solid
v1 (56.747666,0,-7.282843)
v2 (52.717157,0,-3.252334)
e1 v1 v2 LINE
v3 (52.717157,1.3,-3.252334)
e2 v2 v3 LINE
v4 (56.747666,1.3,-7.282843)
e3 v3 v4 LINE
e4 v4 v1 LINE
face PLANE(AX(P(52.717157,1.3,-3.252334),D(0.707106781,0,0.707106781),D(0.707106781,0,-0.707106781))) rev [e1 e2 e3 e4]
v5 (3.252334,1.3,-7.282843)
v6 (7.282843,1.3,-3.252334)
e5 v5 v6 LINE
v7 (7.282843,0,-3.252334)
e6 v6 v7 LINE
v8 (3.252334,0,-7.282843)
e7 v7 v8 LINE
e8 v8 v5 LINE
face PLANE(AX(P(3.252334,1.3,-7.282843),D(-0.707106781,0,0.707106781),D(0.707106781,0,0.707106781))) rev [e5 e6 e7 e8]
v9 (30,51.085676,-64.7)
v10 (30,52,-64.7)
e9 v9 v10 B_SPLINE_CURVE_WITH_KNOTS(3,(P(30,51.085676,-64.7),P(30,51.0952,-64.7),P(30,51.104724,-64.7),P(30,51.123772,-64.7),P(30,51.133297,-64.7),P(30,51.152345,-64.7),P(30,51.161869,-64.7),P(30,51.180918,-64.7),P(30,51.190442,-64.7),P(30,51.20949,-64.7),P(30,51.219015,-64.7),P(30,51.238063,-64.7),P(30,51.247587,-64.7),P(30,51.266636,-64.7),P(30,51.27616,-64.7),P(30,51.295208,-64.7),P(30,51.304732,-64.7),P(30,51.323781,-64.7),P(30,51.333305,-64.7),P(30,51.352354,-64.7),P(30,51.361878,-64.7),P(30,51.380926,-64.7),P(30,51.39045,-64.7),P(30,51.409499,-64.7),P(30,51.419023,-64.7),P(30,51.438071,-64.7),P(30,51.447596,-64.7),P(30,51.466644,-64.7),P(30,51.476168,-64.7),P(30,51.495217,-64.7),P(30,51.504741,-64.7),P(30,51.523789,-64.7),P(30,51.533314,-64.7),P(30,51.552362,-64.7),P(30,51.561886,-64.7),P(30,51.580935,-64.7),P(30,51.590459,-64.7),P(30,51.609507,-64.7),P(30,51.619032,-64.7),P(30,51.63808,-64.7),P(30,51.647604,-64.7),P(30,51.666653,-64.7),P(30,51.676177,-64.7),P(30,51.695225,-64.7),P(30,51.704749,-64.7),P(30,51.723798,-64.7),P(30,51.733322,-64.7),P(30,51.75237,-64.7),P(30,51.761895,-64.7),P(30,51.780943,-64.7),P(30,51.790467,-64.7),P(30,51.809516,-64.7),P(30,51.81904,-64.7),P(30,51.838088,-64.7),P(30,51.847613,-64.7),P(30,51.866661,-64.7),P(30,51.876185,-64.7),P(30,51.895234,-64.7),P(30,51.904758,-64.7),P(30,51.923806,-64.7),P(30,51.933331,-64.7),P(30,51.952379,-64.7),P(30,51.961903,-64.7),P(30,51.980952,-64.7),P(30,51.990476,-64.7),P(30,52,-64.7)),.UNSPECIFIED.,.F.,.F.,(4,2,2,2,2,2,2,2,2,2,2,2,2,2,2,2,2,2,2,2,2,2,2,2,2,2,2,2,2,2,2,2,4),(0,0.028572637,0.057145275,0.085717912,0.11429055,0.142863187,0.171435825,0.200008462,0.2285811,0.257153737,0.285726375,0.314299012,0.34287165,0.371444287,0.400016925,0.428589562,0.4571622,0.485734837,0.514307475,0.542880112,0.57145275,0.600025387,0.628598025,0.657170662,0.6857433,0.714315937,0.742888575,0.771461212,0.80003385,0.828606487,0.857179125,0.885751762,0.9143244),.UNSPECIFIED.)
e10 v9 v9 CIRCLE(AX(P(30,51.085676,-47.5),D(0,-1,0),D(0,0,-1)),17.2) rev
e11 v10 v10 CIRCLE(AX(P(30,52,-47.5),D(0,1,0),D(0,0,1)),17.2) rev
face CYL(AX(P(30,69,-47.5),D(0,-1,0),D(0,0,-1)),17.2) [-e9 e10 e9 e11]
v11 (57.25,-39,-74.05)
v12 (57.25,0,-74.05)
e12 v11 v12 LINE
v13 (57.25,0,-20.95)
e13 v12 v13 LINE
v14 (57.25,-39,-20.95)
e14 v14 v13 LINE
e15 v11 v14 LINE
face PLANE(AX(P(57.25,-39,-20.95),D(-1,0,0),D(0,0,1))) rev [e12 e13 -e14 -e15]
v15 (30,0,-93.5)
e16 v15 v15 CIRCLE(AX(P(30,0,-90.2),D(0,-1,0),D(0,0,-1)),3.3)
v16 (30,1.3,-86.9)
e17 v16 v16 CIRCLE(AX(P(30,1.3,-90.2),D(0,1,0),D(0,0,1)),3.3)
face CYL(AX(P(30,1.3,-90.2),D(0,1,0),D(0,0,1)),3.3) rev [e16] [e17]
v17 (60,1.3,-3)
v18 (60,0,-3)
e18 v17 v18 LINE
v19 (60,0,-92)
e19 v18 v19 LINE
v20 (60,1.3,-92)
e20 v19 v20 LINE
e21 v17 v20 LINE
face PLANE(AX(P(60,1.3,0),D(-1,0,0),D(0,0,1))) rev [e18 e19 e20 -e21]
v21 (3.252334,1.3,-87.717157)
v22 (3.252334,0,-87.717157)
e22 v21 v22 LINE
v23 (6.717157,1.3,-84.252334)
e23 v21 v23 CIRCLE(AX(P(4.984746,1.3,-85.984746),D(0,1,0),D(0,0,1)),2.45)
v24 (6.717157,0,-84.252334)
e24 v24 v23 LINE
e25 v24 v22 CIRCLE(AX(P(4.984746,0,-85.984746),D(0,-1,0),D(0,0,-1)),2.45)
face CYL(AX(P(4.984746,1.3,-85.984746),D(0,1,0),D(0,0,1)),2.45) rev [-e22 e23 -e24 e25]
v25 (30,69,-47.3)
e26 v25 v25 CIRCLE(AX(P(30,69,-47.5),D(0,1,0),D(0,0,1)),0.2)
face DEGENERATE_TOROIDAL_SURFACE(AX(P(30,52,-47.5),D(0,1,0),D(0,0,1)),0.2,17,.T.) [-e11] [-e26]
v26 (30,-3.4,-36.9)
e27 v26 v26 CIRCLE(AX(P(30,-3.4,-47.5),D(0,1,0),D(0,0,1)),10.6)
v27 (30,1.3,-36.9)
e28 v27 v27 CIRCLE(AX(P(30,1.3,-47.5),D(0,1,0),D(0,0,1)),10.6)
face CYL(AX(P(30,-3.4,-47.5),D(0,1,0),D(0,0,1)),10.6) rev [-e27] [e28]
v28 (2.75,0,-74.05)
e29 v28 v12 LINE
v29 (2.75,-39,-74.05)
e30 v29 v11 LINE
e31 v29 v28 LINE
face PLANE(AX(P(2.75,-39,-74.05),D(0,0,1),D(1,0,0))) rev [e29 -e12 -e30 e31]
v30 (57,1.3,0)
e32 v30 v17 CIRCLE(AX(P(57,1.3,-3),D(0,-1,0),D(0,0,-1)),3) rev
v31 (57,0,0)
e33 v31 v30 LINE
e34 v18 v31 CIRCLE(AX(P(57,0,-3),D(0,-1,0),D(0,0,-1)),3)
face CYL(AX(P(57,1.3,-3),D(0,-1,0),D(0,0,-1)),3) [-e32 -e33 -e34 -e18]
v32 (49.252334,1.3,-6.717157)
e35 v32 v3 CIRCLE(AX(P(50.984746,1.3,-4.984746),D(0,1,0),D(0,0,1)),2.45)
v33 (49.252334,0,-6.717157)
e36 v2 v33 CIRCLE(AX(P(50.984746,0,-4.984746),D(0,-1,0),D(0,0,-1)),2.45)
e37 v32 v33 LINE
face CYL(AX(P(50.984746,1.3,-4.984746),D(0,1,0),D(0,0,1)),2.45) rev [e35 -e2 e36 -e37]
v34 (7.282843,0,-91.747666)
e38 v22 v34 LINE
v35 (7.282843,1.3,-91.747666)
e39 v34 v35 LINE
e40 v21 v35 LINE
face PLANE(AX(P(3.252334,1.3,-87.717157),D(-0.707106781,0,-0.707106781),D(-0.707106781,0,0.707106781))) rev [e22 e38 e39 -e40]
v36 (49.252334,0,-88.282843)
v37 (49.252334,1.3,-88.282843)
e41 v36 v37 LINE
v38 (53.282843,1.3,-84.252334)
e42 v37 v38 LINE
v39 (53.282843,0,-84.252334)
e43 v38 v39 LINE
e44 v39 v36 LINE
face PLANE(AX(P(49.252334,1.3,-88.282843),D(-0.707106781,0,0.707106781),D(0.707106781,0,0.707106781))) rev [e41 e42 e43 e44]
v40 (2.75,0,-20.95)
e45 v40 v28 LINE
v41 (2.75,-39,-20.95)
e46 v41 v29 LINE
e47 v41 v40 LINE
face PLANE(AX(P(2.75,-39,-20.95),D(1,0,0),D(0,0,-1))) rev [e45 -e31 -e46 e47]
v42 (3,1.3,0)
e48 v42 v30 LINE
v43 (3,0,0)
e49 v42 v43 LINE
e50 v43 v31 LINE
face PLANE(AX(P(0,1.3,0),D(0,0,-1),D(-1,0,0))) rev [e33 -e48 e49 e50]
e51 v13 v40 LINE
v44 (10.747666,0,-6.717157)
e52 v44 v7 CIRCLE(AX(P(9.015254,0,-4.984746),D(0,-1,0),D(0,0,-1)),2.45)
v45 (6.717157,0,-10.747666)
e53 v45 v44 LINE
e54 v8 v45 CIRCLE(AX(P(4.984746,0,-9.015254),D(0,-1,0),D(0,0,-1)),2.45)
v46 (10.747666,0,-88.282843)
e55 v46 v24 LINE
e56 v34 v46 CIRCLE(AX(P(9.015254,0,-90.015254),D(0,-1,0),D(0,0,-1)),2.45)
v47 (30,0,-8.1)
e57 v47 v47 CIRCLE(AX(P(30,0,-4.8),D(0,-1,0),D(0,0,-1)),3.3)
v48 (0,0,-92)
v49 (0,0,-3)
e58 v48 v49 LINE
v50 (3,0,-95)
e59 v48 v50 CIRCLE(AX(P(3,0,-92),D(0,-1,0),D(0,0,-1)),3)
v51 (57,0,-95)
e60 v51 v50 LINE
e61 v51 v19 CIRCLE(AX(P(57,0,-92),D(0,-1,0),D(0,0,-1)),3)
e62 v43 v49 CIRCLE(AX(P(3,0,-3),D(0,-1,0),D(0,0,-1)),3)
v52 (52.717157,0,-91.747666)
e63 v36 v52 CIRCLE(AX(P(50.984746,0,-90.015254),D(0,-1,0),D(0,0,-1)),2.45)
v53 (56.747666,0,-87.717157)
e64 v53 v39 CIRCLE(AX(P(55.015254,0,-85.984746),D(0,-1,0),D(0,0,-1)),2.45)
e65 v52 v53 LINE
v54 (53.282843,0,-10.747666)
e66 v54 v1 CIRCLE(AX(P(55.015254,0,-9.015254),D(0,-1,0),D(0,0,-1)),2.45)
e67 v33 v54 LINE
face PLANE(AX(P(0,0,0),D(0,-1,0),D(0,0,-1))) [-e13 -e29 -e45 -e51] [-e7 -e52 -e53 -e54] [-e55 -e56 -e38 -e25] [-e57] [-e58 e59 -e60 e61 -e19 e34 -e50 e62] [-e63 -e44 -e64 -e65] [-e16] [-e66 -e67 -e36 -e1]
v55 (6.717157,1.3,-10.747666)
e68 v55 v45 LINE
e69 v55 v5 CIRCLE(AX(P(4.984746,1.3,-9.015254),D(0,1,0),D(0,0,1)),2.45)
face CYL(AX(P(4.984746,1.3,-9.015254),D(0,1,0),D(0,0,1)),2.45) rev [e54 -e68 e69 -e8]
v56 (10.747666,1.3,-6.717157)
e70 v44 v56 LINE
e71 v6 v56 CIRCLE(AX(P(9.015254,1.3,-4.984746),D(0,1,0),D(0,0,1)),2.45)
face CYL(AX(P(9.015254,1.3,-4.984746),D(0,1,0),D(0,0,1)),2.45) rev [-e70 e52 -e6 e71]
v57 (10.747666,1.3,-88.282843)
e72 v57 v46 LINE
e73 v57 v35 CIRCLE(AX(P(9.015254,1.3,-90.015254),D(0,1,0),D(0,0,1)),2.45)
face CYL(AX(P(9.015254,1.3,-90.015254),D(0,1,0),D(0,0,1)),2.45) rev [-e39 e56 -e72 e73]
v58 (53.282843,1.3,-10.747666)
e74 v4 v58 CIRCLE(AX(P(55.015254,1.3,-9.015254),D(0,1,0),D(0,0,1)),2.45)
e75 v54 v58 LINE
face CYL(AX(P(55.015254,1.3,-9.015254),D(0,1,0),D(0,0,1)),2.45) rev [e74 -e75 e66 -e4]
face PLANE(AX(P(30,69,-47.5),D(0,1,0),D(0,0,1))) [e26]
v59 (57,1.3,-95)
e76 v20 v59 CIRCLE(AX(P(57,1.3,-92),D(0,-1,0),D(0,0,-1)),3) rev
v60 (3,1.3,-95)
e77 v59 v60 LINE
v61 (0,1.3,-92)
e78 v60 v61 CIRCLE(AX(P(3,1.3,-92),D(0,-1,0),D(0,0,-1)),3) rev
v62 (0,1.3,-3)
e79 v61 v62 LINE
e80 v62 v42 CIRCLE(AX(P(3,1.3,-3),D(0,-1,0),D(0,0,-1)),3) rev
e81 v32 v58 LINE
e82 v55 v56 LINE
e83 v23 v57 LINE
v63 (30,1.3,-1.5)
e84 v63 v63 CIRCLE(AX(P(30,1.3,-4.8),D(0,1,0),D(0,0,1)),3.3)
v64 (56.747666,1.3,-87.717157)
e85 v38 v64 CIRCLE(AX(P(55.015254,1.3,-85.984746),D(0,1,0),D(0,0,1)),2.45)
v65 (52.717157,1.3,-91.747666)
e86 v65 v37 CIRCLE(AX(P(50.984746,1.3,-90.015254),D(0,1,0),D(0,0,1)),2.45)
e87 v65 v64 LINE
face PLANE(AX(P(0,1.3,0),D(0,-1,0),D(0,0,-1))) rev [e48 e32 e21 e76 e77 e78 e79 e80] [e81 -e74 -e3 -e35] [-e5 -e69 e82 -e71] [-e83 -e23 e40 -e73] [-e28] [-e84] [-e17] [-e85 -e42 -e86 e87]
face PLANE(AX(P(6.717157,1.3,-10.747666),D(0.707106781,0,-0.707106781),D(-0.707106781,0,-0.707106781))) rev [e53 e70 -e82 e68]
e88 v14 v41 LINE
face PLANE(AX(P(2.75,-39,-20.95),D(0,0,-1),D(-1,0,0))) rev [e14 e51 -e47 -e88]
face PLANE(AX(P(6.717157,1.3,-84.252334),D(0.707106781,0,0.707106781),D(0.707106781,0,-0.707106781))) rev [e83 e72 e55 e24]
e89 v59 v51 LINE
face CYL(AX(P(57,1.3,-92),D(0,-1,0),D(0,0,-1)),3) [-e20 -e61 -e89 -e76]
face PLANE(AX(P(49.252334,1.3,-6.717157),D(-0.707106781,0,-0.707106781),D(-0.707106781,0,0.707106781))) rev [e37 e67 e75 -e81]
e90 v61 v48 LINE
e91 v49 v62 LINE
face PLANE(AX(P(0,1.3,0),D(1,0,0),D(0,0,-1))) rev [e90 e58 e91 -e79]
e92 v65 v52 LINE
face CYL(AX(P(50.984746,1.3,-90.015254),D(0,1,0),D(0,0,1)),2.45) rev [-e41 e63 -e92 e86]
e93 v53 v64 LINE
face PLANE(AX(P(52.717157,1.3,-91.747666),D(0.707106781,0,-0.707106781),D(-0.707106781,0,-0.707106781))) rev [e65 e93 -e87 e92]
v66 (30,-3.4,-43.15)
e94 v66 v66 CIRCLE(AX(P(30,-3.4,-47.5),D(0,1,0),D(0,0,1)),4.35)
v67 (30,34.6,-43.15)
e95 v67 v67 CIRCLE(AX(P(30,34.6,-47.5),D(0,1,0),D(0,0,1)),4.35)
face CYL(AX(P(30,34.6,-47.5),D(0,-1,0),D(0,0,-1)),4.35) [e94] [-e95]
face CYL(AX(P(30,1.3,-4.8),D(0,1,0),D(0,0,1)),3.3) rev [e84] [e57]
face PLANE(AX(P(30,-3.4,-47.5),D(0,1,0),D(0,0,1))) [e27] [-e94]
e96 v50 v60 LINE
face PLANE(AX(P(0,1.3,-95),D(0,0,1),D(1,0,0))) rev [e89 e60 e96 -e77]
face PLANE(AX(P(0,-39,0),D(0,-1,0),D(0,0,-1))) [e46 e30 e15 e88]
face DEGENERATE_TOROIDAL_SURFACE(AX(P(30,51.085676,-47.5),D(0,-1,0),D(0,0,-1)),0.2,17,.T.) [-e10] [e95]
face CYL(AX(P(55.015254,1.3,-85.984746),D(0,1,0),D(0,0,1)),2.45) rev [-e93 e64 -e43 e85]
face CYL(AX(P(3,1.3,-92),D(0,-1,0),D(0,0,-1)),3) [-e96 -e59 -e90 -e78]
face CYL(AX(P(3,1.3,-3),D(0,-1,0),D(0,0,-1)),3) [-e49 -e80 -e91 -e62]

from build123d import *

# Parameters (mm, degrees)
SKETCH1_W                = 60
SKETCH1_H                = 95
BOSS_EXTRUDE1_DEPTH      = 1.3
SKETCH3_W                = 54.5
SKETCH3_H                = 53.1
BOSS_EXTRUDE2_DEPTH      = 39
SKETCH2_R                = 10.6
CUT_EXTRUDE1_DEPTH       = 4.7
SKETCH4_R                = 4.35
BOSS_EXTRUDE3_DEPTH      = 38
SKETCH5_R                = 17.2
BOSS_EXTRUDE4_DEPTH      = 34.4
FILLET1_R                = 17
M6_CLEARANCE_SLOT1_D     = 6.6
M5_CLEARANCE_SLOT1_DEPTH = 1.3
M5_CLEARANCE_SLOT2_DEPTH = 1.3
FILLET2_R                = 3


# Read off the part's stored shape, not the designer's step: M5 Clearance Slot1, M5 Clearance Slot2
with BuildPart() as part:
    # Sketch1 → Boss-Extrude1 (new body)
    with BuildSketch(Plane(origin=(0, 0, 0), x_dir=(1, 0, 0), z_dir=(0, 1, 0))):
        with Locations((30, 47.5)):
            Rectangle(SKETCH1_W, SKETCH1_H)
    extrude(amount=BOSS_EXTRUDE1_DEPTH)

    # Sketch3 → Boss-Extrude2 (add)
    with BuildSketch(Plane.XZ):
        with Locations((30, -47.5)):
            Rectangle(SKETCH3_W, SKETCH3_H)
    extrude(amount=BOSS_EXTRUDE2_DEPTH)

    # Sketch2 → Cut-Extrude1 (cut)
    with BuildSketch(Plane(origin=(0, 1.3, 0), x_dir=(1, 0, 0), z_dir=(0, 1, 0))):
        with Locations(Location((30, 47.5, 0), (0, 0, 270))):
            Circle(SKETCH2_R)
    extrude(amount=-CUT_EXTRUDE1_DEPTH, mode=Mode.SUBTRACT)

    # Sketch4 → Boss-Extrude3 (add)
    with BuildSketch(Plane(origin=(0, -3.4, 0), x_dir=(1, 0, 0), z_dir=(0, 1, 0))):
        with Locations(Location((30, 47.5, 0), (0, 0, 270))):
            Circle(SKETCH4_R)
    extrude(amount=BOSS_EXTRUDE3_DEPTH)

    # Sketch5 → Boss-Extrude4 (add)
    with BuildSketch(Plane(origin=(0, 34.6, 0), x_dir=(1, 0, 0), z_dir=(0, 1, 0))):
        with Locations(Location((30, 47.5, 0), (0, 0, 90))):
            Circle(SKETCH5_R)
    extrude(amount=BOSS_EXTRUDE4_DEPTH)

    # Fillet1
    # the kernel refuses this fillet: 17 mm, written as the material it takes off along each edge
    with BuildSketch(Plane(origin=(30, 34.6, -47.5), x_dir=(0, 0, -1), z_dir=(1, 0, 0))) as fillet1_piece_1:
        with BuildLine():
            CenterArc((0.2, 16.4856756), FILLET1_R, 284.129695419, 75.870304581)
            Line((4.35, 0), (4.433, -0.329713512))
            ThreePointArc((4.433, -0.329713512), (10.775, -0.34), (17.2, -0.34))
            Line((17.2, -0.34), (17.54, 0))
            Line((17.54, 0), (17.54, 16.4856756))
            Line((17.54, 16.4856756), (17.2, 16.4856756))
        make_face()
    revolve(axis=Axis((30, 34.6, -47.5), (0, 1, 0)), mode=Mode.SUBTRACT)
    with BuildSketch(Plane(origin=(30, 69, -47.5), x_dir=(0, 0, -1), z_dir=(1, 0, 0))) as fillet1_piece_2:
        with BuildLine():
            CenterArc((17.2 - FILLET1_R, -FILLET1_R), FILLET1_R, 0, 90)
            Line((17.2 - FILLET1_R, 0), (17.2 - FILLET1_R, FILLET1_R * 0.02))
            Line((17.2 - FILLET1_R, FILLET1_R * 0.02), (17.2, FILLET1_R * 0.02))
            Line((17.2, FILLET1_R * 0.02), (17.2 + FILLET1_R * 0.02, 0))
            Line((17.2 + FILLET1_R * 0.02, 0), (17.2 + FILLET1_R * 0.02, -FILLET1_R))
            Line((17.2 + FILLET1_R * 0.02, -FILLET1_R), (17.2, -FILLET1_R))
        make_face()
    revolve(axis=Axis((30, 69, -47.5), (0, 1, 0)), mode=Mode.SUBTRACT)

    # M6 Clearance Slot1 (through all)
    with Locations(Plane(origin=(0, 1.3, 0), x_dir=(1, 0, 0), z_dir=(0, 1, 0))):
        with Locations((30, 4.8), (30, 90.2)):
            Hole(M6_CLEARANCE_SLOT1_D / 2)

    # M5 Clearance Slot1 outline → M5 Clearance Slot1 (cut)
    with BuildSketch(Plane(origin=(0, 0, 0), x_dir=(1, 0, 0), z_dir=(0, 1, 0))):
        with BuildLine():
            Line((52.717157288, 3.25233406), (56.74766594, 7.282842712))
            ThreePointArc((56.74766594, 7.282842712), (56.74766594, 10.74766594), (53.282842712, 10.74766594))
            Line((53.282842712, 10.74766594), (49.25233406, 6.717157288))
            ThreePointArc((49.25233406, 6.717157288), (49.25233406, 3.25233406), (52.717157288, 3.25233406))
        make_face()
        with BuildLine():
            Line((6.717157288, 84.25233406), (10.74766594, 88.282842712))
            ThreePointArc((10.74766594, 88.282842712), (10.74766594, 91.74766594), (7.282842712, 91.74766594))
            Line((7.282842712, 91.74766594), (3.25233406, 87.717157288))
            ThreePointArc((3.25233406, 87.717157288), (3.25233406, 84.25233406), (6.717157288, 84.25233406))
        make_face()
    extrude(amount=M5_CLEARANCE_SLOT1_DEPTH, mode=Mode.SUBTRACT)

    # M5 Clearance Slot2 outline → M5 Clearance Slot2 (cut)
    with BuildSketch(Plane(origin=(0, 0, 0), x_dir=(1, 0, 0), z_dir=(0, 1, 0))):
        with BuildLine():
            Line((49.25233406, 88.282842712), (53.282842712, 84.25233406))
            ThreePointArc((53.282842712, 84.25233406), (56.74766594, 84.25233406), (56.74766594, 87.717157288))
            Line((56.74766594, 87.717157288), (52.717157288, 91.74766594))
            ThreePointArc((52.717157288, 91.74766594), (49.25233406, 91.74766594), (49.25233406, 88.282842712))
        make_face()
        with BuildLine():
            Line((3.25233406, 7.282842712), (7.282842712, 3.25233406))
            ThreePointArc((7.282842712, 3.25233406), (10.74766594, 3.25233406), (10.74766594, 6.717157288))
            Line((10.74766594, 6.717157288), (6.717157288, 10.74766594))
            ThreePointArc((6.717157288, 10.74766594), (3.25233406, 10.74766594), (3.25233406, 7.282842712))
        make_face()
    extrude(amount=M5_CLEARANCE_SLOT2_DEPTH, mode=Mode.SUBTRACT)

    # Fillet2
    fillet2_edges = [part.edges().sort_by_distance(p)[0] for p in [
        (0, 0.65, -95),
        (60, 0.65, -95),
        (60, 0.65, 0),
        (0, 0.65, 0),
    ]]
    fillet(fillet2_edges, radius=FILLET2_R)


solid = part.part
